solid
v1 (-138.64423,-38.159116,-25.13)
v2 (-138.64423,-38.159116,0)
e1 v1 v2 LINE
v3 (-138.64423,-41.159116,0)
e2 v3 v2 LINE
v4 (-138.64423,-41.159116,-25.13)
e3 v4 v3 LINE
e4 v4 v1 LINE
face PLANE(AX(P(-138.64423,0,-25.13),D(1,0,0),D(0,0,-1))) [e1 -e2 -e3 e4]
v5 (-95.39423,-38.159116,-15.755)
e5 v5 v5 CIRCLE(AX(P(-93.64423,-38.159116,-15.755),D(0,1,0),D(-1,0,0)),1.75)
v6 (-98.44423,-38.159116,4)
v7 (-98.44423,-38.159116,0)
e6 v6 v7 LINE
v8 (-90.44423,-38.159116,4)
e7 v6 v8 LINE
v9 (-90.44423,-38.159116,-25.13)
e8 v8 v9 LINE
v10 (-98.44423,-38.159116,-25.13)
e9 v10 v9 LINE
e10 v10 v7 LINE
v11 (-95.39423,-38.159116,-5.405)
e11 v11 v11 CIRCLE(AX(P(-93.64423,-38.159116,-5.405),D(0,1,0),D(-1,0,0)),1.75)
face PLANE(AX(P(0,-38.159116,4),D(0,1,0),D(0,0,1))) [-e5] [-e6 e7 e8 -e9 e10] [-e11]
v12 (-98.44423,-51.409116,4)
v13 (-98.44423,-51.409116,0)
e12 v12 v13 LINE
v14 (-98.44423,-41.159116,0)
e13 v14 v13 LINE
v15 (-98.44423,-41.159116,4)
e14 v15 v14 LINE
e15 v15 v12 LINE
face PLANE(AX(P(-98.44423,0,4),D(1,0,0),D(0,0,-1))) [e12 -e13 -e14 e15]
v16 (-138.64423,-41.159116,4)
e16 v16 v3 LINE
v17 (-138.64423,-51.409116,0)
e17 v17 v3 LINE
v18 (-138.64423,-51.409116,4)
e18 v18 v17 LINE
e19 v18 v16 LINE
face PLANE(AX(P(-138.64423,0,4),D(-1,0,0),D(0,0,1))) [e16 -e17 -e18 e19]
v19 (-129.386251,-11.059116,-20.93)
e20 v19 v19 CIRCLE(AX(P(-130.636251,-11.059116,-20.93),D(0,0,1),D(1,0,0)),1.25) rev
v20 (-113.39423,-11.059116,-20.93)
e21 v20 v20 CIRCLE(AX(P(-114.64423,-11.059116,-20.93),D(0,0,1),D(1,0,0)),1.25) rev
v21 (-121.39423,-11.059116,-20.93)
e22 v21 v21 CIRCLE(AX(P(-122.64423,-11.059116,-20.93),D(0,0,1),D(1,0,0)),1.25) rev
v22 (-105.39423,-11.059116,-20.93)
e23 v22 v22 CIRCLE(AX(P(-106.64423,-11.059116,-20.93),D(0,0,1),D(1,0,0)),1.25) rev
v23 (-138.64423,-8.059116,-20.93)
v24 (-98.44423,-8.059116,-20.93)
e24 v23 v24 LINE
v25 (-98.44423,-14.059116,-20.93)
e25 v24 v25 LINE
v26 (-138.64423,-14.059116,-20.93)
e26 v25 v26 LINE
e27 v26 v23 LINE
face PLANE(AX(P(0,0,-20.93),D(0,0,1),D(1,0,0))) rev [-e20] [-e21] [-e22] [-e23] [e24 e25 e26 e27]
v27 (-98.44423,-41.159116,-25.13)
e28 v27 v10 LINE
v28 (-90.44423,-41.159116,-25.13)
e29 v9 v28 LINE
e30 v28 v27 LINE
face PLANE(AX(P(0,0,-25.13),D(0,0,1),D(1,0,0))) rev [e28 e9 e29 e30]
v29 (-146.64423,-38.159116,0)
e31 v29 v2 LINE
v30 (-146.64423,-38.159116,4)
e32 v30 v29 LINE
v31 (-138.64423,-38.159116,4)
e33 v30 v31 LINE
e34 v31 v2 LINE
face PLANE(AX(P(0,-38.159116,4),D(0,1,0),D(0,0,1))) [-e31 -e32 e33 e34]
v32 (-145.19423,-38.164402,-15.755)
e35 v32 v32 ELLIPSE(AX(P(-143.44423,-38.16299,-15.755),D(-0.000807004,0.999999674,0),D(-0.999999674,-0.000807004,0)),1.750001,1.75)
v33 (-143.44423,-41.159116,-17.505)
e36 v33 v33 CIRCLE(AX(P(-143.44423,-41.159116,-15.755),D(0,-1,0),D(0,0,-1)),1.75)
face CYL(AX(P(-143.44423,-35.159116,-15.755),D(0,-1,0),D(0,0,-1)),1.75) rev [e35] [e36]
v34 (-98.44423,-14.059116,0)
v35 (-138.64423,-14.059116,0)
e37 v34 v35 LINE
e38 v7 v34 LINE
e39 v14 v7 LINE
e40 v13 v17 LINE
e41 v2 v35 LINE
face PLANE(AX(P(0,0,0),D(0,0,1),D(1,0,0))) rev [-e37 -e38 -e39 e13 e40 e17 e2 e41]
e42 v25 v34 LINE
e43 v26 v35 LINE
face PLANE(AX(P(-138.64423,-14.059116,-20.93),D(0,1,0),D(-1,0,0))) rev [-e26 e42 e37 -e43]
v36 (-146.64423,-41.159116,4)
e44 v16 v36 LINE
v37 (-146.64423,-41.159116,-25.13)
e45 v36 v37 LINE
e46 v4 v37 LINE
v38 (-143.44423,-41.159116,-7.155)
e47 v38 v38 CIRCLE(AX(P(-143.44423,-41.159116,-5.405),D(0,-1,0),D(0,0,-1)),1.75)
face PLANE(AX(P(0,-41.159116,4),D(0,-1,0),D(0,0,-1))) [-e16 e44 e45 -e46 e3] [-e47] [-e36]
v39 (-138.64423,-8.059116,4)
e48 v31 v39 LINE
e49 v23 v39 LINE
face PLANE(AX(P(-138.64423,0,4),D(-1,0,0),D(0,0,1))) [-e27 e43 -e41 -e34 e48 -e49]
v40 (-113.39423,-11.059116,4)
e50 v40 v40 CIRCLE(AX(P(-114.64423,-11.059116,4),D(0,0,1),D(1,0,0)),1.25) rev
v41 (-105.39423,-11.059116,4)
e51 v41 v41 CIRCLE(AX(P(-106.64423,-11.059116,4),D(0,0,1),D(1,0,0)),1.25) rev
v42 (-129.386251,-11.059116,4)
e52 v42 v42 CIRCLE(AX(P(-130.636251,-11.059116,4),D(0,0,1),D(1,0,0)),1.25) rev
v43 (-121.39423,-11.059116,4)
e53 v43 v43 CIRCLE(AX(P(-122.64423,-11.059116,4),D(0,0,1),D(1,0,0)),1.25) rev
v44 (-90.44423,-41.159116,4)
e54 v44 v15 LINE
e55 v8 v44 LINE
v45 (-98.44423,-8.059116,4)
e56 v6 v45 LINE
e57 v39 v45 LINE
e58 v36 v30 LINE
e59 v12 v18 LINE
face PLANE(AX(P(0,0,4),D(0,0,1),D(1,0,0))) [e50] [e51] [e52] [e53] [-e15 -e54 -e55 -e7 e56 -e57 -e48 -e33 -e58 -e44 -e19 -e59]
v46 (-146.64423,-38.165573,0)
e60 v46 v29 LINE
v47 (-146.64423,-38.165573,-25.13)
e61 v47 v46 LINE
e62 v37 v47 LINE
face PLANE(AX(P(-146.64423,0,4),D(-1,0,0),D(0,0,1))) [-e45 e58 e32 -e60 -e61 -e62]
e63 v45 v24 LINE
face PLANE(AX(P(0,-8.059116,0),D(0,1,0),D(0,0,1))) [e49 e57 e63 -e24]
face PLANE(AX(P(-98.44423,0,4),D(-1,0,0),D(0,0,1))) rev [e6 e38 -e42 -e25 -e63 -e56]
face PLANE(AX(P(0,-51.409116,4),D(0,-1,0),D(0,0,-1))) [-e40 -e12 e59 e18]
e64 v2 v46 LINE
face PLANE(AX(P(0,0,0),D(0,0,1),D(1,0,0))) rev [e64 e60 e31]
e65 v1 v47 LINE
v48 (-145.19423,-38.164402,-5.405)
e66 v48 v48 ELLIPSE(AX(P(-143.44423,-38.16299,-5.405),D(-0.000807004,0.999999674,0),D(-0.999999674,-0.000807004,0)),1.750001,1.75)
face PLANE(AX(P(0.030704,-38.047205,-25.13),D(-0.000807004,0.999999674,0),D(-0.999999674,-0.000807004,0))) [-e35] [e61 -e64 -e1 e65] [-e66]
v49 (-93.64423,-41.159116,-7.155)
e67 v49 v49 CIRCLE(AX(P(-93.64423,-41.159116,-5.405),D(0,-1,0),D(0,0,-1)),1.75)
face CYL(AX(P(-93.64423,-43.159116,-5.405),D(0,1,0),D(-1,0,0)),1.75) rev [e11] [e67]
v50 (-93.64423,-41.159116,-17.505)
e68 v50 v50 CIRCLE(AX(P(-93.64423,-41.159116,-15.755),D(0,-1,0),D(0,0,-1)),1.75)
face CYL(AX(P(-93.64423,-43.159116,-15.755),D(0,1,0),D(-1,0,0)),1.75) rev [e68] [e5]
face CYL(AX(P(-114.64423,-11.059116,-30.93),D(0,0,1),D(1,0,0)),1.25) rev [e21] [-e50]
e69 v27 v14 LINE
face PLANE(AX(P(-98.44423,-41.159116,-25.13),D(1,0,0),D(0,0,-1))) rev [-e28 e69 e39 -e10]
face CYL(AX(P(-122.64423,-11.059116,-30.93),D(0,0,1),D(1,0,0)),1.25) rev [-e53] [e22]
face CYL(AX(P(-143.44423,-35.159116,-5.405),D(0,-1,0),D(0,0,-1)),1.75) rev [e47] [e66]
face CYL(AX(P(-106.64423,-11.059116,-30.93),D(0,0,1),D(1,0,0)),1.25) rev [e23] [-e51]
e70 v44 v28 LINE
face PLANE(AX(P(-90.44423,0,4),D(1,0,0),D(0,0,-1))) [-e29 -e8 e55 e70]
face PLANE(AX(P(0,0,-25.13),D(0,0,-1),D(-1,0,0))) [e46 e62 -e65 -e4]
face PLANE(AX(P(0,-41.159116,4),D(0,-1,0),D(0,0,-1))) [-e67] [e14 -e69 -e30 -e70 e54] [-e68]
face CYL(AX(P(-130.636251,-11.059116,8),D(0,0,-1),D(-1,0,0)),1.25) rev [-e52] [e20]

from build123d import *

# Parameters (mm, degrees)
BOSS_EXTRUDE2_DEPTH      = 4
BOSS_EXTRUDE3_DEPTH      = 25.13
SKETCH7_W                = 8
SKETCH7_H                = 3
BOSS_EXTRUDE4_DEPTH      = 25.13
SKETCH32_W               = 40.2
SKETCH32_H               = 6
BOSS_EXTRUDE6_DEPTH      = 20.93
SKETCH70_R               = 1.75
CUT_EXTRUDE23_DEPTH      = 5
SKETCH71_R               = 1.75
CUT_EXTRUDE24_DEPTH      = 6
CUT_EXTRUDE26_DEPTH      = 10
CUT_EXTRUDE26_DEPTH_BACK = 25
SKETCH86_R               = 1.25
SKETCH88_W               = 40.2
SKETCH88_H               = 4
BOSS_EXTRUDE26_DEPTH     = 6
CUT_EXTRUDE28_DEPTH      = 4
CUT_EXTRUDE28_DEPTH_BACK = 30
SKETCH89_R               = 1.25


with BuildPart() as part:
    # Sketch5 → Boss-Extrude2 (new body)
    with BuildSketch(Plane.XY):
        Polygon((-138.644230049, -41.159116495), (-138.644230049, -51.409116495), (-98.444230049, -51.409116495), (-98.444230049, -41.159116495), (-90.444230049, -41.159116495), (-90.444230049, -38.159116495), (-98.444230049, -38.159116495), (-98.444230049, -14.059116495), (-138.644230049, -14.059116495), (-138.644230049, -38.159116495), (-146.644230049, -38.159116495), (-146.644230049, -41.159116495), align=None)
    extrude(amount=BOSS_EXTRUDE2_DEPTH)

    # Sketch6 → Boss-Extrude3 (add)
    with BuildSketch(Plane(origin=(0, 0, 0), x_dir=(-1, 0, 0), z_dir=(0, 0, -1))):
        Polygon((146.644230049, -38.165572531), (138.644230049, -38.159116495), (138.644230049, -41.159116495), (146.644230049, -41.159116495), align=None)
    extrude(amount=BOSS_EXTRUDE3_DEPTH)

    # Sketch7 → Boss-Extrude4 (add)
    with BuildSketch(Plane(origin=(0, 0, 0), x_dir=(-1, 0, 0), z_dir=(0, 0, -1))):
        with Locations((94.444230049, -39.659116495)):
            Rectangle(SKETCH7_W, SKETCH7_H)
    extrude(amount=BOSS_EXTRUDE4_DEPTH)

    # Sketch70 → Cut-Extrude23 (cut)
    with BuildSketch(Plane(origin=(0, -38.159116495, 0), x_dir=(1, 0, 0), z_dir=(0, 1, 0))):
        with Locations((-93.644230062, 15.755)):
            Circle(SKETCH70_R)
        with Locations((-93.644230062, 5.405)):
            Circle(SKETCH70_R)
    extrude(amount=-CUT_EXTRUDE23_DEPTH, mode=Mode.SUBTRACT)

    # Sketch71 → Cut-Extrude24 (cut)
    with BuildSketch(Plane(origin=(0, -41.159116495, 0), x_dir=(-1, 0, 0), z_dir=(0, -1, 0))):
        with Locations((143.444230049, 15.755)):
            Circle(SKETCH71_R)
        with Locations((143.444230049, 5.405)):
            Circle(SKETCH71_R)
    extrude(amount=-CUT_EXTRUDE24_DEPTH, mode=Mode.SUBTRACT)



with BuildPart() as body_2:
    # Sketch32 → Boss-Extrude6 (new body)
    with BuildSketch(Plane(origin=(0, 0, 0), x_dir=(-1, 0, 0), z_dir=(0, 0, -1))):
        with Locations((118.544230049, -11.059116495)):
            Rectangle(SKETCH32_W, SKETCH32_H)
    extrude(amount=BOSS_EXTRUDE6_DEPTH)

    # Sketch86 → Cut-Extrude26 (cut, two sides: drawn at the far end of the back side and taken through both)
    with BuildSketch(Plane(origin=(0, 0, -20.93), x_dir=(-1, 0, 0), z_dir=(0, 0, -1)).offset(-CUT_EXTRUDE26_DEPTH_BACK)):
        with Locations((122.644230049, -11.0591165)):
            Circle(SKETCH86_R)
        with Locations((114.644230049, -11.0591165)):
            Circle(SKETCH86_R)
        with Locations((106.644230049, -11.0591165)):
            Circle(SKETCH86_R)
    extrude(amount=CUT_EXTRUDE26_DEPTH + CUT_EXTRUDE26_DEPTH_BACK, mode=Mode.SUBTRACT)


with BuildPart() as part_1:
    add(part.part)

    add(body_2.part)  # Boss-Extrude26 merges body 2
    # Sketch88 → Boss-Extrude26 (add)
    with BuildSketch(Plane(origin=(0, -14.059116495, 0), x_dir=(1, 0, 0), z_dir=(0, 1, 0))):
        with Locations((-118.544230049, -2)):
            Rectangle(SKETCH88_W, SKETCH88_H)
    extrude(amount=BOSS_EXTRUDE26_DEPTH)

    # Sketch89 → Cut-Extrude28 (cut, two sides: drawn at the far end of the back side and taken through both)
    with BuildSketch(Plane.XY.offset(4).offset(-CUT_EXTRUDE28_DEPTH_BACK)):
        with Locations((-130.636250743, -11.059116495)):
            Circle(SKETCH89_R)
        with Locations((-122.644230049, -11.059116495)):
            Circle(SKETCH89_R)
        with Locations((-114.644230049, -11.059116495)):
            Circle(SKETCH89_R)
        with Locations((-106.644230049, -11.059116495)):
            Circle(SKETCH89_R)
    extrude(amount=CUT_EXTRUDE28_DEPTH + CUT_EXTRUDE28_DEPTH_BACK, mode=Mode.SUBTRACT)


solid = part_1.part
